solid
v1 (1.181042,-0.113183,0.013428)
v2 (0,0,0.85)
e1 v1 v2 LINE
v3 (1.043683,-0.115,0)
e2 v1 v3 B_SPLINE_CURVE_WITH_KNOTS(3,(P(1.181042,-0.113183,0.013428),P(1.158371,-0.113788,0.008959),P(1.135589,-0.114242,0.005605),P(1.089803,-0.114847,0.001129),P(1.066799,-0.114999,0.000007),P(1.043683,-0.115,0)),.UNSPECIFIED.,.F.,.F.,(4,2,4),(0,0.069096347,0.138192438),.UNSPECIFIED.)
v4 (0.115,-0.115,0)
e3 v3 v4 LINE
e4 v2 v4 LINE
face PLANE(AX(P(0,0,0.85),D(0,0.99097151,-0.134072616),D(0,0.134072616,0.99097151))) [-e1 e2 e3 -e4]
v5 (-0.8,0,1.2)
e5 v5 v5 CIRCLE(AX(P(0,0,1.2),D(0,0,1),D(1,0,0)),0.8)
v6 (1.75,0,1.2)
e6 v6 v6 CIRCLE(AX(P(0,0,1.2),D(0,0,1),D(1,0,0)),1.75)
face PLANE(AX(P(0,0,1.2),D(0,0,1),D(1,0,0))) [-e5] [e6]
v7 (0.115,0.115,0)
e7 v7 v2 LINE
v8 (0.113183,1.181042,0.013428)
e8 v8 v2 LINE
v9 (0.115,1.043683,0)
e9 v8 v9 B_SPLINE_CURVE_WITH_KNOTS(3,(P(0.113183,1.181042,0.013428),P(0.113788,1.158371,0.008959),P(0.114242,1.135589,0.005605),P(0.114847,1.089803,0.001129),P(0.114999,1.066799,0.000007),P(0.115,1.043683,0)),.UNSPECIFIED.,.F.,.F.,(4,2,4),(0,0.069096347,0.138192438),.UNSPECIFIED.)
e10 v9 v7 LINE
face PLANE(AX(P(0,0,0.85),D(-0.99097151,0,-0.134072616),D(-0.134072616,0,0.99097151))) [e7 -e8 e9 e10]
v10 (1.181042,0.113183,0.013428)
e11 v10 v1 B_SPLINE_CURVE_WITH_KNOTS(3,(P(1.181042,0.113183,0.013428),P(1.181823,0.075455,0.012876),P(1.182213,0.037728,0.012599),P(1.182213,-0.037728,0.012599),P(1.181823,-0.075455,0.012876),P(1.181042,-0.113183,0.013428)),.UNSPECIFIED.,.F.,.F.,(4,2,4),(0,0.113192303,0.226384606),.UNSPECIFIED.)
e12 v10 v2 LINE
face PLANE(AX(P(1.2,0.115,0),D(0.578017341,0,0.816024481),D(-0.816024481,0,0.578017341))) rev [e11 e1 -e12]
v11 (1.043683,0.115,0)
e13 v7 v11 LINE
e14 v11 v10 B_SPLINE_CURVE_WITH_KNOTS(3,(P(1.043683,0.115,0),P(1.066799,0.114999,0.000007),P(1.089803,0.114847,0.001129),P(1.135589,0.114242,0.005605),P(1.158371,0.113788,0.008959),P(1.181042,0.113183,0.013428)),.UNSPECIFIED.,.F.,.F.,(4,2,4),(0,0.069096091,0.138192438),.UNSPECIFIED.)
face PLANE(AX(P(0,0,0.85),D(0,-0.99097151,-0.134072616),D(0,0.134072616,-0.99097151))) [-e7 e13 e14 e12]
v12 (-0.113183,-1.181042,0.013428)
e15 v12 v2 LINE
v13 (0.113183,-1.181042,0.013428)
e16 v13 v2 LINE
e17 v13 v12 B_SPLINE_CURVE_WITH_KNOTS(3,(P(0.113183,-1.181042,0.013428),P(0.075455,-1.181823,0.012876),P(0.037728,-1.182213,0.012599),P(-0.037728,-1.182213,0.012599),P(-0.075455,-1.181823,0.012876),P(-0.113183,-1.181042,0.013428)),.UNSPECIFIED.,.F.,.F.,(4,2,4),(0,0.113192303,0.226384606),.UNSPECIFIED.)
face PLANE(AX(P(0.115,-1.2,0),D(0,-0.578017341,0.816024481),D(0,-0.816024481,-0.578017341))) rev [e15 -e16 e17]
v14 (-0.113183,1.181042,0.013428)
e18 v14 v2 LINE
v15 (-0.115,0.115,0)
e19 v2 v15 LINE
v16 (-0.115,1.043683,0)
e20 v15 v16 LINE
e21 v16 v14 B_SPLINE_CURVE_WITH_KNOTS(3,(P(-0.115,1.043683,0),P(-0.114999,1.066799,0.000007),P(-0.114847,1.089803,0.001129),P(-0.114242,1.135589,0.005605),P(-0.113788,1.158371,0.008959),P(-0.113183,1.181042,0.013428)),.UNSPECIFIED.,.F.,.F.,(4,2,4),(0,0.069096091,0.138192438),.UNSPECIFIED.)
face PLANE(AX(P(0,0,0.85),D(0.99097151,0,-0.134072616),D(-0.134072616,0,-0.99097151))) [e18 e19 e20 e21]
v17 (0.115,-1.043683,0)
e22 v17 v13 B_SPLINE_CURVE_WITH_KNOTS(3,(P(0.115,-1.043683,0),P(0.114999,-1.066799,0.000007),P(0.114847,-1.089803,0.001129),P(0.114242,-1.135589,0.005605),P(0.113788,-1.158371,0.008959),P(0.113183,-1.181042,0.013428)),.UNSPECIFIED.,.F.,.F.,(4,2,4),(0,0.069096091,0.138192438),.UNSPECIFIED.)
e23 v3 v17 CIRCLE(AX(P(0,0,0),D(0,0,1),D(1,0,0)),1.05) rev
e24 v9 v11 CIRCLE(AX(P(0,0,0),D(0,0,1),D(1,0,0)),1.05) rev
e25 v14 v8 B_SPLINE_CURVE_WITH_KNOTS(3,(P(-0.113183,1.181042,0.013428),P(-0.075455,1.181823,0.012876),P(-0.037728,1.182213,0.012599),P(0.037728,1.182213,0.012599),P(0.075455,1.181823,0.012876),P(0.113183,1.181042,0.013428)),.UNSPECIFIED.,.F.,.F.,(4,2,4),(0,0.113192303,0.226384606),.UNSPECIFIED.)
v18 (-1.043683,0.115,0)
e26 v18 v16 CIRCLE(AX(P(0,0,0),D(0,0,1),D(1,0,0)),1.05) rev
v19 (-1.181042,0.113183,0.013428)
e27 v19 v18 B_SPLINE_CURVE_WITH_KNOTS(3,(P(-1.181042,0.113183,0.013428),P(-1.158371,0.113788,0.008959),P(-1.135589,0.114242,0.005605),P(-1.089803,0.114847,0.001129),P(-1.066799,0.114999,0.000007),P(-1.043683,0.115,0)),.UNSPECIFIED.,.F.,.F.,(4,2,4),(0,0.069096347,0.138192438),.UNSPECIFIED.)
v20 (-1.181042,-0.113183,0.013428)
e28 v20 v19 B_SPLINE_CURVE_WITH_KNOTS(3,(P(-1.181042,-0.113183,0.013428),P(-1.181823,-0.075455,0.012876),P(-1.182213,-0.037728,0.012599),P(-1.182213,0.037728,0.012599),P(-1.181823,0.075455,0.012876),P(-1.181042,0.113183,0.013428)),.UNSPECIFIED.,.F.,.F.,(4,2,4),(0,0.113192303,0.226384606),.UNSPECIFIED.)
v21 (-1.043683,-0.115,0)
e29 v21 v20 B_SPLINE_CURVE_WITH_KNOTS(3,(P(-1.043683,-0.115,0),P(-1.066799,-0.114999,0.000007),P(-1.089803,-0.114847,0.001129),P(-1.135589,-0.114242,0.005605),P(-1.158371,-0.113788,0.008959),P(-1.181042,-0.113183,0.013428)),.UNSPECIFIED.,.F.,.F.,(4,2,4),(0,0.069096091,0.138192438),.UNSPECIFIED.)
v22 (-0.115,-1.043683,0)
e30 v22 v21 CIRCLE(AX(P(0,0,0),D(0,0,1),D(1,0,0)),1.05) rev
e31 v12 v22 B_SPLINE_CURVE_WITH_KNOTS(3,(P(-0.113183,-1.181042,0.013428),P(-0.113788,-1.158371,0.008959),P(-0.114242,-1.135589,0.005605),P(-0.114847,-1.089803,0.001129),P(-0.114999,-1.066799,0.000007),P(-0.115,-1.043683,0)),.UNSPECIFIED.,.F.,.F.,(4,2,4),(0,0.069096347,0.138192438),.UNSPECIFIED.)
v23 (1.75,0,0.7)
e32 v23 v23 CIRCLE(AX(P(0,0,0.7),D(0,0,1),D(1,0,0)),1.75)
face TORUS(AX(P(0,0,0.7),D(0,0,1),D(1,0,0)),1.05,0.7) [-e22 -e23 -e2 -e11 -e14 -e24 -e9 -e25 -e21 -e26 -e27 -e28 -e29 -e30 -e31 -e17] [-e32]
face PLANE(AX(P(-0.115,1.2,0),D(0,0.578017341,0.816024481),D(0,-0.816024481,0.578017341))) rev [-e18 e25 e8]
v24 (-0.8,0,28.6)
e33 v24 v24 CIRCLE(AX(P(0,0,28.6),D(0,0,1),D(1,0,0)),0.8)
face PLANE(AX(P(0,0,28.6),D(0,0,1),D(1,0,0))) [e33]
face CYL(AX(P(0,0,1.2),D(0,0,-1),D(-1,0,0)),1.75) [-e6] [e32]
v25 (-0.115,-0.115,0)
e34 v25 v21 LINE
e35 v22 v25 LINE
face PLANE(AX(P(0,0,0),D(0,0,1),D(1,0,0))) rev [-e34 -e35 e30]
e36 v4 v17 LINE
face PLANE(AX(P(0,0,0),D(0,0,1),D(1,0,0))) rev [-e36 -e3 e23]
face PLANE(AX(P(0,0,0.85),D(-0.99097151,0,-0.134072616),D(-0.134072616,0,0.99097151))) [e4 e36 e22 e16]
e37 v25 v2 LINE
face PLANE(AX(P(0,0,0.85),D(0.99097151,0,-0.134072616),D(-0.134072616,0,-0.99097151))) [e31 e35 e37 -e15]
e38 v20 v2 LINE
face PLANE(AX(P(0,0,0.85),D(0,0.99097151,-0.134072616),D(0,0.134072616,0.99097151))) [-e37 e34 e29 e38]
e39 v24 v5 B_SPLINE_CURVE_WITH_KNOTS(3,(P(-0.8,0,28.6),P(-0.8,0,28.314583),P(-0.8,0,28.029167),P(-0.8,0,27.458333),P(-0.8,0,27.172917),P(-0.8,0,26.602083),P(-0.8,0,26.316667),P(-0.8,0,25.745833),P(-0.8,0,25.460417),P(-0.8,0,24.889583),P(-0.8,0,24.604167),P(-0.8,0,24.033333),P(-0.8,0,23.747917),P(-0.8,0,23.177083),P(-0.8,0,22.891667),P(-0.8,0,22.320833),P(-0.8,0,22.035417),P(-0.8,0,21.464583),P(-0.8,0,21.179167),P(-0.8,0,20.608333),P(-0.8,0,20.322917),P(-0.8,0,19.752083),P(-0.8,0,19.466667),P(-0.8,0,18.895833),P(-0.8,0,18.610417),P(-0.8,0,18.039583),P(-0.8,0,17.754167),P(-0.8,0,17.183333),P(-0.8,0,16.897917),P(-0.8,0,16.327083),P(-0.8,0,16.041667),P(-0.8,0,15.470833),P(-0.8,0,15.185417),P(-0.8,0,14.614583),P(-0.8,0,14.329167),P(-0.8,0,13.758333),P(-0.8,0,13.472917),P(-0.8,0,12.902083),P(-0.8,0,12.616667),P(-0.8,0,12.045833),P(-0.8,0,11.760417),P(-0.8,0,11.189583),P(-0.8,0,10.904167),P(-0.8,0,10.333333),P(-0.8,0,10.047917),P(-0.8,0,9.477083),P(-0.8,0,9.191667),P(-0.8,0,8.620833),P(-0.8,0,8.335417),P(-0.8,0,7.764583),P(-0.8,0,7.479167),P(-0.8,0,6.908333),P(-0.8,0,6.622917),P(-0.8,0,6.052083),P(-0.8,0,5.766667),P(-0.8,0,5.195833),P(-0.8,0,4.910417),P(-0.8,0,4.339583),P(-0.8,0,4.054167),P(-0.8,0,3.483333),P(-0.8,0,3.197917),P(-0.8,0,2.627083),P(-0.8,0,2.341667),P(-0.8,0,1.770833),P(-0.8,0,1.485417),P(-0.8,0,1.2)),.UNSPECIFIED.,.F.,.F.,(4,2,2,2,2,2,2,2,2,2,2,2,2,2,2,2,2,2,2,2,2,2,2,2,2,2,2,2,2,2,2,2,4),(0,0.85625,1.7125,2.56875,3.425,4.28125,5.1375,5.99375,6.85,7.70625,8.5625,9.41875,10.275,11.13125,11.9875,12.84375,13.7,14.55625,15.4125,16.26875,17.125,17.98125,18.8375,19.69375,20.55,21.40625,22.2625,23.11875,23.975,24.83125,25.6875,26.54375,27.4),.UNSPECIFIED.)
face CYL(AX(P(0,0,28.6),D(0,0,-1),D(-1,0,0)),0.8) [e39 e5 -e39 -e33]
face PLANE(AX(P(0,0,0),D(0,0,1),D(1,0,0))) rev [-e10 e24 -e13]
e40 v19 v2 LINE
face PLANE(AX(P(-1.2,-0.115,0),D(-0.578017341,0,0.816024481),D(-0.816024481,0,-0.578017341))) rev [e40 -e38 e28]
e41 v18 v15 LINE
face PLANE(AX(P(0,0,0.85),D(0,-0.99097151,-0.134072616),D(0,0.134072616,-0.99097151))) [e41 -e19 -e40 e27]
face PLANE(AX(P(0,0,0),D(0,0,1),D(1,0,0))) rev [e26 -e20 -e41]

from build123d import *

# Parameters (mm, degrees)
SKETCH_1_R               = 1.75
EXTRUDE_1_DEPTH          = 1.2
SKETCH_2_R               = 0.8
EXTRUDE_2_DEPTH          = 27.4
PATTERN_CIRCULAR_1_COUNT = 4
FILLET_2_R               = 0.7


with BuildPart() as part:
    # 草圖1 → 伸長1 (new body)
    with BuildSketch(Plane.XY):
        Circle(SKETCH_1_R)
    extrude(amount=EXTRUDE_1_DEPTH)

    # 草圖2 → 伸長2 (add)
    with BuildSketch(Plane.XY.offset(1.2)):
        with Locations(Location((0, 0, 0), (0, 0, 180))):
            Circle(SKETCH_2_R)
    extrude(amount=EXTRUDE_2_DEPTH)

    # 草圖3 → 除料-疊層拉伸1 section 0
    with BuildSketch(Plane(origin=(0, 0, 0), x_dir=(-1, 0, 0), z_dir=(0, 0, -1)), mode=Mode.PRIVATE) as loft_1_s0:
        with BuildLine():
            Line((-0.115, 1.2), (0.115, 1.2))
            Line((0.115, 1.2), (0.115, -1.2))
            Line((0.115, -1.2), (-0.115, -1.2))
            Line((-0.115, -1.2), (-0.115, 1.2))
        make_face()
    loft_1 = loft([loft_1_s0.sketch, Vertex(0, 0, 0.85)], mode=Mode.SUBTRACT)

    # 環狀複製排列1: 除料-疊層拉伸1 ×4 about axis
    pattern_circular_1_axis = Axis((0, 0, 0), (0, 0, 1))
    for i in range(1, PATTERN_CIRCULAR_1_COUNT):
        add(loft_1.rotate(pattern_circular_1_axis, i * 360 / PATTERN_CIRCULAR_1_COUNT), mode=Mode.SUBTRACT)

    # 圓角2
    # the kernel refuses this fillet: 0.7 mm, written as the material it takes off along each edge
    with BuildSketch(Plane(origin=(0, 0, 0), x_dir=(1, 0, 0), z_dir=(0, -1, 0))) as fillet_2_piece_1:
        with BuildLine():
            CenterArc((1.75 - FILLET_2_R, FILLET_2_R), FILLET_2_R, 270, 90)
            Line((1.75 - FILLET_2_R, 0), (1.75, 0))
            Line((1.75, 0), (1.75, FILLET_2_R))
        make_face()
    revolve(axis=Axis((0, 0, 0), (0, 0, 1)), mode=Mode.SUBTRACT)


solid = part.part
